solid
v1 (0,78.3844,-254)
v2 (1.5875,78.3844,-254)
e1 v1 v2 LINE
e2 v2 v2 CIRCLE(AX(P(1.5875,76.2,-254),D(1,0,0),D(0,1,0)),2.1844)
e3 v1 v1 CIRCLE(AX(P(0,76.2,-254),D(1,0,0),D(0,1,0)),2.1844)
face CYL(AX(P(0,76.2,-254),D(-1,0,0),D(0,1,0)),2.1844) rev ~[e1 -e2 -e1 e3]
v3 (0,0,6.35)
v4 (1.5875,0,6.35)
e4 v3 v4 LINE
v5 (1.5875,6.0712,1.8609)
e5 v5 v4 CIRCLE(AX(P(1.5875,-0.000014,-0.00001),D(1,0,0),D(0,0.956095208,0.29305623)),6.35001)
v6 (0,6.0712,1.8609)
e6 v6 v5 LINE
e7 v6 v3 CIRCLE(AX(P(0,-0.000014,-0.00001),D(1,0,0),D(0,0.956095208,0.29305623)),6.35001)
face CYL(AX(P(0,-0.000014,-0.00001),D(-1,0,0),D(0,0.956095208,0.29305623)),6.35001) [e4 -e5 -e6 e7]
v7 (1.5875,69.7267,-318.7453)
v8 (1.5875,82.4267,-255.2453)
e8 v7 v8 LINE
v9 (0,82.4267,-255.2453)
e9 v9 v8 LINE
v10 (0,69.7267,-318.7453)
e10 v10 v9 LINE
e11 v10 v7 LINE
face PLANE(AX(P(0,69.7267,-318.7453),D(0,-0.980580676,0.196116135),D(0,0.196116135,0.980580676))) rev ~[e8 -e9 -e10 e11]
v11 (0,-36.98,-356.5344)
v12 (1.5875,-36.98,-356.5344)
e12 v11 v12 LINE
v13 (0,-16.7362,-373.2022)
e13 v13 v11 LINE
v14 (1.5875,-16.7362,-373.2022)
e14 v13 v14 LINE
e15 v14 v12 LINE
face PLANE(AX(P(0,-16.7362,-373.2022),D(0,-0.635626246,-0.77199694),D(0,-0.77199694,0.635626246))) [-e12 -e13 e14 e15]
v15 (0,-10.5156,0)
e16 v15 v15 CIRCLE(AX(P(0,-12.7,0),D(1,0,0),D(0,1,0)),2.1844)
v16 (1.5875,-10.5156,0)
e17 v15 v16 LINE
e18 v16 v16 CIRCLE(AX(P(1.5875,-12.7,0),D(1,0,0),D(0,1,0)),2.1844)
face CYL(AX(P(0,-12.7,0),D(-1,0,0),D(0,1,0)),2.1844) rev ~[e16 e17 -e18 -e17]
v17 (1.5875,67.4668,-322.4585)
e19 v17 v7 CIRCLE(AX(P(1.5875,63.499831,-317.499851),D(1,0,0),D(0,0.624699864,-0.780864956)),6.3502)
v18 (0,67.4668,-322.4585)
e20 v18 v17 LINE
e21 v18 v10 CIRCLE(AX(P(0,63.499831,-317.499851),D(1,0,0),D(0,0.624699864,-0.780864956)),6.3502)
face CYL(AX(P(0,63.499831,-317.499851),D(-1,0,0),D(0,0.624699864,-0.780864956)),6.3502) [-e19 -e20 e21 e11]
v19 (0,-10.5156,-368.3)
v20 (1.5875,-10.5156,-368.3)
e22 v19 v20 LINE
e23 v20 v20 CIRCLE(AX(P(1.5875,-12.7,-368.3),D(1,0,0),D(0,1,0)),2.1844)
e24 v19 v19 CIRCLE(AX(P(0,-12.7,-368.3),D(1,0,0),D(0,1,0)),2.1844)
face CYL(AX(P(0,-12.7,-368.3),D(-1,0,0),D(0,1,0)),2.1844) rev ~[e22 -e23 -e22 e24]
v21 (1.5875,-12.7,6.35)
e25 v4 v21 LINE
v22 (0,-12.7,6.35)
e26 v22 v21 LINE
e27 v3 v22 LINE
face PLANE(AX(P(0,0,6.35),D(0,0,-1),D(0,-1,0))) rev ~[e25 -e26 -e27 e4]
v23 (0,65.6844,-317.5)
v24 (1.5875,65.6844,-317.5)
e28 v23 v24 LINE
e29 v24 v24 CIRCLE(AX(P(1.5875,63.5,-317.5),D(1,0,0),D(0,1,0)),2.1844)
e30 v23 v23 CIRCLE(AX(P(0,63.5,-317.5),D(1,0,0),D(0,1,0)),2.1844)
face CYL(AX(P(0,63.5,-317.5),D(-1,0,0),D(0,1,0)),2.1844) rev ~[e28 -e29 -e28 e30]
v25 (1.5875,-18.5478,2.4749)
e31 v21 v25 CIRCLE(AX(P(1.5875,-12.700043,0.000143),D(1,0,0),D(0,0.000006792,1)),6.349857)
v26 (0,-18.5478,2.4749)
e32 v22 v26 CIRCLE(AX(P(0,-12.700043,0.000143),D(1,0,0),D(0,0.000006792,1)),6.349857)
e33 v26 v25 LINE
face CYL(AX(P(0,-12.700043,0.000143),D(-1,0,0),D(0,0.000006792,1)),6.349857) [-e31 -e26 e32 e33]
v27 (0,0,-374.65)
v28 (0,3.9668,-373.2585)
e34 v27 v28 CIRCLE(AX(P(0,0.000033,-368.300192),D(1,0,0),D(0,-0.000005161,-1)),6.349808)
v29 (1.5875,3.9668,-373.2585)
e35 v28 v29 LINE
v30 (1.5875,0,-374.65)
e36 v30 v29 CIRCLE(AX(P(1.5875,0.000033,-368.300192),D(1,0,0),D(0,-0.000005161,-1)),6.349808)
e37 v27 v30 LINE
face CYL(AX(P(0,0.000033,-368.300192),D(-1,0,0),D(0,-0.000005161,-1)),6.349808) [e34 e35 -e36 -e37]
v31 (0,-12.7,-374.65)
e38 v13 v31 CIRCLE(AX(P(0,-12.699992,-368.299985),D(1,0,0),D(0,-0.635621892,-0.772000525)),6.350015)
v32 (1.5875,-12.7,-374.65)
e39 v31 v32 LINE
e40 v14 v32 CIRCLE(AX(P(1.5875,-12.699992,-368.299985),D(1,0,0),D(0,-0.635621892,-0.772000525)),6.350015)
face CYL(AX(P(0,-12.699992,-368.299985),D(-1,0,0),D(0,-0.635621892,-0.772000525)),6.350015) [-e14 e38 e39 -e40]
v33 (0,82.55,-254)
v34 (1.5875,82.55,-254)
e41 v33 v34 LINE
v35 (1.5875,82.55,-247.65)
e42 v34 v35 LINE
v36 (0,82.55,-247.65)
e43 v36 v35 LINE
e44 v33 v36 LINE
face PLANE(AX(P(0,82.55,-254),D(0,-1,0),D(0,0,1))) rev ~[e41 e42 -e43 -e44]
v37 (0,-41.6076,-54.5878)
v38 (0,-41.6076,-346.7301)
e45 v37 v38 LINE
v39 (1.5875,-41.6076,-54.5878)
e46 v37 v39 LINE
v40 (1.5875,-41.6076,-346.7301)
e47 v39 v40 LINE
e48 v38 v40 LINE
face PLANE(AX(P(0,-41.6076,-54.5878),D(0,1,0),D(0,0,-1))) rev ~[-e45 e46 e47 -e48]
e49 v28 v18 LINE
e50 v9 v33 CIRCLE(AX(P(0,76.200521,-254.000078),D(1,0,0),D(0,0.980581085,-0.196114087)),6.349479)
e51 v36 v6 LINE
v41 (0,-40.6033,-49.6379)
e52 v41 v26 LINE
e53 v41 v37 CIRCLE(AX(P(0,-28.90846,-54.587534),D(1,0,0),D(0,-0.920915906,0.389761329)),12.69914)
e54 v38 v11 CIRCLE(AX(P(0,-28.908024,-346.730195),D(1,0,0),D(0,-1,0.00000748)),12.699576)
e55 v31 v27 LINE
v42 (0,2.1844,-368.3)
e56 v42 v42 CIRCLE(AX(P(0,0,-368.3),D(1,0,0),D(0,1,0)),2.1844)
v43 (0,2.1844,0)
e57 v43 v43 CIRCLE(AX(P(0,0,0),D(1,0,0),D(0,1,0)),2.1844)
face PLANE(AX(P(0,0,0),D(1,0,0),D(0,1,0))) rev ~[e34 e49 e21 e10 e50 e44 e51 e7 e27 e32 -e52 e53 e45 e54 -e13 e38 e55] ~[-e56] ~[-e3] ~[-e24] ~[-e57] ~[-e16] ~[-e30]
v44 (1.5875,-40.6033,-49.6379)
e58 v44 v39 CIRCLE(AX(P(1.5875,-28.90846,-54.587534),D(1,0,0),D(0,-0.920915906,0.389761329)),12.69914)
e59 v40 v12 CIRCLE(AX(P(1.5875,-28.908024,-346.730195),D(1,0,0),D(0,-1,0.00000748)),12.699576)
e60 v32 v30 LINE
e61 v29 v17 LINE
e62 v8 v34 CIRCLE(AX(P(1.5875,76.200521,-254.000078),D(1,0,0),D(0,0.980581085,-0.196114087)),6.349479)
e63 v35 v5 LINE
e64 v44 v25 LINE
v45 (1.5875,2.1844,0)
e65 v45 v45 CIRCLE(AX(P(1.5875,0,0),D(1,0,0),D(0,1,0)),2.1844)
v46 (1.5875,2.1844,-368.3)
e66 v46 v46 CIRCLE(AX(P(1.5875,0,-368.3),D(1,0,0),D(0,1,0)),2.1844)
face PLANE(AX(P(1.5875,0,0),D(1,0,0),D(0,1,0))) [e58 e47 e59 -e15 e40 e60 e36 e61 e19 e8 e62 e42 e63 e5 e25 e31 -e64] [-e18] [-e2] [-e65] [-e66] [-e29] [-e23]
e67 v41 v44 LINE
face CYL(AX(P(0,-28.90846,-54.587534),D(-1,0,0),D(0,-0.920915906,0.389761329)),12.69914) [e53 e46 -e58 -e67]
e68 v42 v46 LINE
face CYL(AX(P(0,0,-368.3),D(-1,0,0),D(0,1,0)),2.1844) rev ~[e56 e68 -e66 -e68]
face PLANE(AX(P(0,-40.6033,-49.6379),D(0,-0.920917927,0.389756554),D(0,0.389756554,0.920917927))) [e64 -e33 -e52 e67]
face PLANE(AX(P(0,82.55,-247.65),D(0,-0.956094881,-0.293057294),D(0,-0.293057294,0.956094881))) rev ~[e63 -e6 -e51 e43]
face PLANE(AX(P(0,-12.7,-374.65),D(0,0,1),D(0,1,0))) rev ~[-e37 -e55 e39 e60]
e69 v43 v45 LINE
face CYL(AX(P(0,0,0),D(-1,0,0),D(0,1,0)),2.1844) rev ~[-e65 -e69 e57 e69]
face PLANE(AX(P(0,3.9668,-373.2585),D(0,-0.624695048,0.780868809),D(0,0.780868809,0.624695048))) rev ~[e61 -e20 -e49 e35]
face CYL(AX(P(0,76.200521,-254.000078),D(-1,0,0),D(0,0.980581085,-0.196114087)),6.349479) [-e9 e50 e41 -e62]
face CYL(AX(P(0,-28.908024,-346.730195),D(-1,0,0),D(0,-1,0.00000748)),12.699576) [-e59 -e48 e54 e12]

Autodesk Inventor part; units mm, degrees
ref_plane "YZ Plane" through (0, 0, 0) normal (1, 0, 0) x (0, 1, 0)
ref_plane "XZ Plane" through (0, 0, 0) normal (0, 1, 0) x (-1, 0, 0)
ref_plane "XY Plane" through (0, 0, 0) normal (0, 0, 1) x (1, 0, 0)
sketch "maiin" plane through (0, 0, 0) normal (0, 0, 1) x (1, 0, 0)
  circle A0 centre (114.3234, 350.4213) radius 2.1844
  circle A1 centre (127.0234, 350.4213) radius 2.1844
  line L0 (86.4201, 300.7833) -> (108.4755, 352.8962)
  arc A2 (86.4201, 300.7833) -> (85.4157, 295.8335) centre (98.1157, 295.8335) ccw
  line L1 (209.5734, 102.7713) -> (133.0946, 352.2822)
  line L2 (209.5734, 96.4213) -> (209.5734, 102.7713)
  circle A3 centre (203.2234, 96.4213) radius 2.1844
  arc A4 (209.45, 95.176) -> (209.5734, 96.4213) centre (203.2234, 96.4213) ccw
  line L3 (196.75, 31.676) -> (209.45, 95.176)
  circle A5 centre (190.5234, 32.9213) radius 2.1844
  line L4 (85.4157, 295.8335) -> (85.4157, 3.6912)
  circle A6 centre (127.0234, -17.8787) radius 2.1844
  circle A7 centre (114.3234, -17.8787) radius 2.1844
  arc A8 (127.0234, -24.2287) -> (130.9902, -22.8372) centre (127.0234, -17.8787) ccw
  arc A9 (110.2871, -22.7809) -> (114.3234, -24.2287) centre (114.3234, -17.8787) ccw
  arc A10 (194.4902, 27.9628) -> (196.75, 31.676) centre (190.5234, 32.9213) ccw
  arc A11 (85.4157, 3.6912) -> (90.0433, -6.1132) centre (98.1157, 3.6912) ccw
  line L5 (130.9902, -22.8372) -> (194.4902, 27.9628)
  line L6 (110.2871, -22.7809) -> (90.0433, -6.1132)
  line L7 (114.3234, -24.2287) -> (127.0234, -24.2287)
  arc A12 (114.3234, 356.7713) -> (108.4755, 352.8962) centre (114.3234, 350.4213) ccw
  line L8 (127.0234, 356.7713) -> (114.3234, 356.7713)
  arc A13 (133.0946, 352.2822) -> (127.0234, 356.7713) centre (127.0234, 350.4213) ccw
  point P0 (137.6055, 139.9011)
  point P1 (110.8157, 355.7146)
  dimension "d0" = 12.7
  dimension "d1" = 12.7
  dimension "d2" = 25.4
sketch "Sketch1" plane through (0, 0, 0) normal (1, 0, 0) x (0, 1, 0)
  circle A0 centre (-12.7, 0) radius 2.1844
  circle A1 centre (0, 0) radius 2.1844
  line L0 (-40.6033, -49.6379) -> (-18.5478, 2.4749)
  arc A2 (-40.6033, -49.6379) -> (-41.6076, -54.5878) centre (-28.9076, -54.5878) ccw
  line L1 (82.55, -247.65) -> (6.0712, 1.8609)
  line L2 (82.55, -254) -> (82.55, -247.65)
  circle A3 centre (76.2, -254) radius 2.1844
  arc A4 (82.4267, -255.2453) -> (82.55, -254) centre (76.2, -254) ccw
  line L3 (69.7267, -318.7453) -> (82.4267, -255.2453)
  circle A5 centre (63.5, -317.5) radius 2.1844
  line L4 (-41.6076, -54.5878) -> (-41.6076, -346.7301)
  circle A6 centre (0, -368.3) radius 2.1844
  circle A7 centre (-12.7, -368.3) radius 2.1844
  arc A8 (0, -374.65) -> (3.9668, -373.2585) centre (0, -368.3) ccw
  arc A9 (-16.7362, -373.2022) -> (-12.7, -374.65) centre (-12.7, -368.3) ccw
  arc A10 (67.4668, -322.4585) -> (69.7267, -318.7453) centre (63.5, -317.5) ccw
  arc A11 (-41.6076, -346.7301) -> (-36.98, -356.5344) centre (-28.9076, -346.7301) ccw
  line L5 (3.9668, -373.2585) -> (67.4668, -322.4585)
  line L6 (-16.7362, -373.2022) -> (-36.98, -356.5344)
  line L7 (-12.7, -374.65) -> (0, -374.65)
  arc A12 (-12.7, 6.35) -> (-18.5478, 2.4749) centre (-12.7, 0) ccw
  line L8 (0, 6.35) -> (-12.7, 6.35)
  arc A13 (6.0712, 1.8609) -> (0, 6.35) centre (0, 0) ccw
extrude "Extrusion1" add sketch "Sketch1" along normal blind 1.5875
properties part number "skirt" material "Acetal Resin, White"
